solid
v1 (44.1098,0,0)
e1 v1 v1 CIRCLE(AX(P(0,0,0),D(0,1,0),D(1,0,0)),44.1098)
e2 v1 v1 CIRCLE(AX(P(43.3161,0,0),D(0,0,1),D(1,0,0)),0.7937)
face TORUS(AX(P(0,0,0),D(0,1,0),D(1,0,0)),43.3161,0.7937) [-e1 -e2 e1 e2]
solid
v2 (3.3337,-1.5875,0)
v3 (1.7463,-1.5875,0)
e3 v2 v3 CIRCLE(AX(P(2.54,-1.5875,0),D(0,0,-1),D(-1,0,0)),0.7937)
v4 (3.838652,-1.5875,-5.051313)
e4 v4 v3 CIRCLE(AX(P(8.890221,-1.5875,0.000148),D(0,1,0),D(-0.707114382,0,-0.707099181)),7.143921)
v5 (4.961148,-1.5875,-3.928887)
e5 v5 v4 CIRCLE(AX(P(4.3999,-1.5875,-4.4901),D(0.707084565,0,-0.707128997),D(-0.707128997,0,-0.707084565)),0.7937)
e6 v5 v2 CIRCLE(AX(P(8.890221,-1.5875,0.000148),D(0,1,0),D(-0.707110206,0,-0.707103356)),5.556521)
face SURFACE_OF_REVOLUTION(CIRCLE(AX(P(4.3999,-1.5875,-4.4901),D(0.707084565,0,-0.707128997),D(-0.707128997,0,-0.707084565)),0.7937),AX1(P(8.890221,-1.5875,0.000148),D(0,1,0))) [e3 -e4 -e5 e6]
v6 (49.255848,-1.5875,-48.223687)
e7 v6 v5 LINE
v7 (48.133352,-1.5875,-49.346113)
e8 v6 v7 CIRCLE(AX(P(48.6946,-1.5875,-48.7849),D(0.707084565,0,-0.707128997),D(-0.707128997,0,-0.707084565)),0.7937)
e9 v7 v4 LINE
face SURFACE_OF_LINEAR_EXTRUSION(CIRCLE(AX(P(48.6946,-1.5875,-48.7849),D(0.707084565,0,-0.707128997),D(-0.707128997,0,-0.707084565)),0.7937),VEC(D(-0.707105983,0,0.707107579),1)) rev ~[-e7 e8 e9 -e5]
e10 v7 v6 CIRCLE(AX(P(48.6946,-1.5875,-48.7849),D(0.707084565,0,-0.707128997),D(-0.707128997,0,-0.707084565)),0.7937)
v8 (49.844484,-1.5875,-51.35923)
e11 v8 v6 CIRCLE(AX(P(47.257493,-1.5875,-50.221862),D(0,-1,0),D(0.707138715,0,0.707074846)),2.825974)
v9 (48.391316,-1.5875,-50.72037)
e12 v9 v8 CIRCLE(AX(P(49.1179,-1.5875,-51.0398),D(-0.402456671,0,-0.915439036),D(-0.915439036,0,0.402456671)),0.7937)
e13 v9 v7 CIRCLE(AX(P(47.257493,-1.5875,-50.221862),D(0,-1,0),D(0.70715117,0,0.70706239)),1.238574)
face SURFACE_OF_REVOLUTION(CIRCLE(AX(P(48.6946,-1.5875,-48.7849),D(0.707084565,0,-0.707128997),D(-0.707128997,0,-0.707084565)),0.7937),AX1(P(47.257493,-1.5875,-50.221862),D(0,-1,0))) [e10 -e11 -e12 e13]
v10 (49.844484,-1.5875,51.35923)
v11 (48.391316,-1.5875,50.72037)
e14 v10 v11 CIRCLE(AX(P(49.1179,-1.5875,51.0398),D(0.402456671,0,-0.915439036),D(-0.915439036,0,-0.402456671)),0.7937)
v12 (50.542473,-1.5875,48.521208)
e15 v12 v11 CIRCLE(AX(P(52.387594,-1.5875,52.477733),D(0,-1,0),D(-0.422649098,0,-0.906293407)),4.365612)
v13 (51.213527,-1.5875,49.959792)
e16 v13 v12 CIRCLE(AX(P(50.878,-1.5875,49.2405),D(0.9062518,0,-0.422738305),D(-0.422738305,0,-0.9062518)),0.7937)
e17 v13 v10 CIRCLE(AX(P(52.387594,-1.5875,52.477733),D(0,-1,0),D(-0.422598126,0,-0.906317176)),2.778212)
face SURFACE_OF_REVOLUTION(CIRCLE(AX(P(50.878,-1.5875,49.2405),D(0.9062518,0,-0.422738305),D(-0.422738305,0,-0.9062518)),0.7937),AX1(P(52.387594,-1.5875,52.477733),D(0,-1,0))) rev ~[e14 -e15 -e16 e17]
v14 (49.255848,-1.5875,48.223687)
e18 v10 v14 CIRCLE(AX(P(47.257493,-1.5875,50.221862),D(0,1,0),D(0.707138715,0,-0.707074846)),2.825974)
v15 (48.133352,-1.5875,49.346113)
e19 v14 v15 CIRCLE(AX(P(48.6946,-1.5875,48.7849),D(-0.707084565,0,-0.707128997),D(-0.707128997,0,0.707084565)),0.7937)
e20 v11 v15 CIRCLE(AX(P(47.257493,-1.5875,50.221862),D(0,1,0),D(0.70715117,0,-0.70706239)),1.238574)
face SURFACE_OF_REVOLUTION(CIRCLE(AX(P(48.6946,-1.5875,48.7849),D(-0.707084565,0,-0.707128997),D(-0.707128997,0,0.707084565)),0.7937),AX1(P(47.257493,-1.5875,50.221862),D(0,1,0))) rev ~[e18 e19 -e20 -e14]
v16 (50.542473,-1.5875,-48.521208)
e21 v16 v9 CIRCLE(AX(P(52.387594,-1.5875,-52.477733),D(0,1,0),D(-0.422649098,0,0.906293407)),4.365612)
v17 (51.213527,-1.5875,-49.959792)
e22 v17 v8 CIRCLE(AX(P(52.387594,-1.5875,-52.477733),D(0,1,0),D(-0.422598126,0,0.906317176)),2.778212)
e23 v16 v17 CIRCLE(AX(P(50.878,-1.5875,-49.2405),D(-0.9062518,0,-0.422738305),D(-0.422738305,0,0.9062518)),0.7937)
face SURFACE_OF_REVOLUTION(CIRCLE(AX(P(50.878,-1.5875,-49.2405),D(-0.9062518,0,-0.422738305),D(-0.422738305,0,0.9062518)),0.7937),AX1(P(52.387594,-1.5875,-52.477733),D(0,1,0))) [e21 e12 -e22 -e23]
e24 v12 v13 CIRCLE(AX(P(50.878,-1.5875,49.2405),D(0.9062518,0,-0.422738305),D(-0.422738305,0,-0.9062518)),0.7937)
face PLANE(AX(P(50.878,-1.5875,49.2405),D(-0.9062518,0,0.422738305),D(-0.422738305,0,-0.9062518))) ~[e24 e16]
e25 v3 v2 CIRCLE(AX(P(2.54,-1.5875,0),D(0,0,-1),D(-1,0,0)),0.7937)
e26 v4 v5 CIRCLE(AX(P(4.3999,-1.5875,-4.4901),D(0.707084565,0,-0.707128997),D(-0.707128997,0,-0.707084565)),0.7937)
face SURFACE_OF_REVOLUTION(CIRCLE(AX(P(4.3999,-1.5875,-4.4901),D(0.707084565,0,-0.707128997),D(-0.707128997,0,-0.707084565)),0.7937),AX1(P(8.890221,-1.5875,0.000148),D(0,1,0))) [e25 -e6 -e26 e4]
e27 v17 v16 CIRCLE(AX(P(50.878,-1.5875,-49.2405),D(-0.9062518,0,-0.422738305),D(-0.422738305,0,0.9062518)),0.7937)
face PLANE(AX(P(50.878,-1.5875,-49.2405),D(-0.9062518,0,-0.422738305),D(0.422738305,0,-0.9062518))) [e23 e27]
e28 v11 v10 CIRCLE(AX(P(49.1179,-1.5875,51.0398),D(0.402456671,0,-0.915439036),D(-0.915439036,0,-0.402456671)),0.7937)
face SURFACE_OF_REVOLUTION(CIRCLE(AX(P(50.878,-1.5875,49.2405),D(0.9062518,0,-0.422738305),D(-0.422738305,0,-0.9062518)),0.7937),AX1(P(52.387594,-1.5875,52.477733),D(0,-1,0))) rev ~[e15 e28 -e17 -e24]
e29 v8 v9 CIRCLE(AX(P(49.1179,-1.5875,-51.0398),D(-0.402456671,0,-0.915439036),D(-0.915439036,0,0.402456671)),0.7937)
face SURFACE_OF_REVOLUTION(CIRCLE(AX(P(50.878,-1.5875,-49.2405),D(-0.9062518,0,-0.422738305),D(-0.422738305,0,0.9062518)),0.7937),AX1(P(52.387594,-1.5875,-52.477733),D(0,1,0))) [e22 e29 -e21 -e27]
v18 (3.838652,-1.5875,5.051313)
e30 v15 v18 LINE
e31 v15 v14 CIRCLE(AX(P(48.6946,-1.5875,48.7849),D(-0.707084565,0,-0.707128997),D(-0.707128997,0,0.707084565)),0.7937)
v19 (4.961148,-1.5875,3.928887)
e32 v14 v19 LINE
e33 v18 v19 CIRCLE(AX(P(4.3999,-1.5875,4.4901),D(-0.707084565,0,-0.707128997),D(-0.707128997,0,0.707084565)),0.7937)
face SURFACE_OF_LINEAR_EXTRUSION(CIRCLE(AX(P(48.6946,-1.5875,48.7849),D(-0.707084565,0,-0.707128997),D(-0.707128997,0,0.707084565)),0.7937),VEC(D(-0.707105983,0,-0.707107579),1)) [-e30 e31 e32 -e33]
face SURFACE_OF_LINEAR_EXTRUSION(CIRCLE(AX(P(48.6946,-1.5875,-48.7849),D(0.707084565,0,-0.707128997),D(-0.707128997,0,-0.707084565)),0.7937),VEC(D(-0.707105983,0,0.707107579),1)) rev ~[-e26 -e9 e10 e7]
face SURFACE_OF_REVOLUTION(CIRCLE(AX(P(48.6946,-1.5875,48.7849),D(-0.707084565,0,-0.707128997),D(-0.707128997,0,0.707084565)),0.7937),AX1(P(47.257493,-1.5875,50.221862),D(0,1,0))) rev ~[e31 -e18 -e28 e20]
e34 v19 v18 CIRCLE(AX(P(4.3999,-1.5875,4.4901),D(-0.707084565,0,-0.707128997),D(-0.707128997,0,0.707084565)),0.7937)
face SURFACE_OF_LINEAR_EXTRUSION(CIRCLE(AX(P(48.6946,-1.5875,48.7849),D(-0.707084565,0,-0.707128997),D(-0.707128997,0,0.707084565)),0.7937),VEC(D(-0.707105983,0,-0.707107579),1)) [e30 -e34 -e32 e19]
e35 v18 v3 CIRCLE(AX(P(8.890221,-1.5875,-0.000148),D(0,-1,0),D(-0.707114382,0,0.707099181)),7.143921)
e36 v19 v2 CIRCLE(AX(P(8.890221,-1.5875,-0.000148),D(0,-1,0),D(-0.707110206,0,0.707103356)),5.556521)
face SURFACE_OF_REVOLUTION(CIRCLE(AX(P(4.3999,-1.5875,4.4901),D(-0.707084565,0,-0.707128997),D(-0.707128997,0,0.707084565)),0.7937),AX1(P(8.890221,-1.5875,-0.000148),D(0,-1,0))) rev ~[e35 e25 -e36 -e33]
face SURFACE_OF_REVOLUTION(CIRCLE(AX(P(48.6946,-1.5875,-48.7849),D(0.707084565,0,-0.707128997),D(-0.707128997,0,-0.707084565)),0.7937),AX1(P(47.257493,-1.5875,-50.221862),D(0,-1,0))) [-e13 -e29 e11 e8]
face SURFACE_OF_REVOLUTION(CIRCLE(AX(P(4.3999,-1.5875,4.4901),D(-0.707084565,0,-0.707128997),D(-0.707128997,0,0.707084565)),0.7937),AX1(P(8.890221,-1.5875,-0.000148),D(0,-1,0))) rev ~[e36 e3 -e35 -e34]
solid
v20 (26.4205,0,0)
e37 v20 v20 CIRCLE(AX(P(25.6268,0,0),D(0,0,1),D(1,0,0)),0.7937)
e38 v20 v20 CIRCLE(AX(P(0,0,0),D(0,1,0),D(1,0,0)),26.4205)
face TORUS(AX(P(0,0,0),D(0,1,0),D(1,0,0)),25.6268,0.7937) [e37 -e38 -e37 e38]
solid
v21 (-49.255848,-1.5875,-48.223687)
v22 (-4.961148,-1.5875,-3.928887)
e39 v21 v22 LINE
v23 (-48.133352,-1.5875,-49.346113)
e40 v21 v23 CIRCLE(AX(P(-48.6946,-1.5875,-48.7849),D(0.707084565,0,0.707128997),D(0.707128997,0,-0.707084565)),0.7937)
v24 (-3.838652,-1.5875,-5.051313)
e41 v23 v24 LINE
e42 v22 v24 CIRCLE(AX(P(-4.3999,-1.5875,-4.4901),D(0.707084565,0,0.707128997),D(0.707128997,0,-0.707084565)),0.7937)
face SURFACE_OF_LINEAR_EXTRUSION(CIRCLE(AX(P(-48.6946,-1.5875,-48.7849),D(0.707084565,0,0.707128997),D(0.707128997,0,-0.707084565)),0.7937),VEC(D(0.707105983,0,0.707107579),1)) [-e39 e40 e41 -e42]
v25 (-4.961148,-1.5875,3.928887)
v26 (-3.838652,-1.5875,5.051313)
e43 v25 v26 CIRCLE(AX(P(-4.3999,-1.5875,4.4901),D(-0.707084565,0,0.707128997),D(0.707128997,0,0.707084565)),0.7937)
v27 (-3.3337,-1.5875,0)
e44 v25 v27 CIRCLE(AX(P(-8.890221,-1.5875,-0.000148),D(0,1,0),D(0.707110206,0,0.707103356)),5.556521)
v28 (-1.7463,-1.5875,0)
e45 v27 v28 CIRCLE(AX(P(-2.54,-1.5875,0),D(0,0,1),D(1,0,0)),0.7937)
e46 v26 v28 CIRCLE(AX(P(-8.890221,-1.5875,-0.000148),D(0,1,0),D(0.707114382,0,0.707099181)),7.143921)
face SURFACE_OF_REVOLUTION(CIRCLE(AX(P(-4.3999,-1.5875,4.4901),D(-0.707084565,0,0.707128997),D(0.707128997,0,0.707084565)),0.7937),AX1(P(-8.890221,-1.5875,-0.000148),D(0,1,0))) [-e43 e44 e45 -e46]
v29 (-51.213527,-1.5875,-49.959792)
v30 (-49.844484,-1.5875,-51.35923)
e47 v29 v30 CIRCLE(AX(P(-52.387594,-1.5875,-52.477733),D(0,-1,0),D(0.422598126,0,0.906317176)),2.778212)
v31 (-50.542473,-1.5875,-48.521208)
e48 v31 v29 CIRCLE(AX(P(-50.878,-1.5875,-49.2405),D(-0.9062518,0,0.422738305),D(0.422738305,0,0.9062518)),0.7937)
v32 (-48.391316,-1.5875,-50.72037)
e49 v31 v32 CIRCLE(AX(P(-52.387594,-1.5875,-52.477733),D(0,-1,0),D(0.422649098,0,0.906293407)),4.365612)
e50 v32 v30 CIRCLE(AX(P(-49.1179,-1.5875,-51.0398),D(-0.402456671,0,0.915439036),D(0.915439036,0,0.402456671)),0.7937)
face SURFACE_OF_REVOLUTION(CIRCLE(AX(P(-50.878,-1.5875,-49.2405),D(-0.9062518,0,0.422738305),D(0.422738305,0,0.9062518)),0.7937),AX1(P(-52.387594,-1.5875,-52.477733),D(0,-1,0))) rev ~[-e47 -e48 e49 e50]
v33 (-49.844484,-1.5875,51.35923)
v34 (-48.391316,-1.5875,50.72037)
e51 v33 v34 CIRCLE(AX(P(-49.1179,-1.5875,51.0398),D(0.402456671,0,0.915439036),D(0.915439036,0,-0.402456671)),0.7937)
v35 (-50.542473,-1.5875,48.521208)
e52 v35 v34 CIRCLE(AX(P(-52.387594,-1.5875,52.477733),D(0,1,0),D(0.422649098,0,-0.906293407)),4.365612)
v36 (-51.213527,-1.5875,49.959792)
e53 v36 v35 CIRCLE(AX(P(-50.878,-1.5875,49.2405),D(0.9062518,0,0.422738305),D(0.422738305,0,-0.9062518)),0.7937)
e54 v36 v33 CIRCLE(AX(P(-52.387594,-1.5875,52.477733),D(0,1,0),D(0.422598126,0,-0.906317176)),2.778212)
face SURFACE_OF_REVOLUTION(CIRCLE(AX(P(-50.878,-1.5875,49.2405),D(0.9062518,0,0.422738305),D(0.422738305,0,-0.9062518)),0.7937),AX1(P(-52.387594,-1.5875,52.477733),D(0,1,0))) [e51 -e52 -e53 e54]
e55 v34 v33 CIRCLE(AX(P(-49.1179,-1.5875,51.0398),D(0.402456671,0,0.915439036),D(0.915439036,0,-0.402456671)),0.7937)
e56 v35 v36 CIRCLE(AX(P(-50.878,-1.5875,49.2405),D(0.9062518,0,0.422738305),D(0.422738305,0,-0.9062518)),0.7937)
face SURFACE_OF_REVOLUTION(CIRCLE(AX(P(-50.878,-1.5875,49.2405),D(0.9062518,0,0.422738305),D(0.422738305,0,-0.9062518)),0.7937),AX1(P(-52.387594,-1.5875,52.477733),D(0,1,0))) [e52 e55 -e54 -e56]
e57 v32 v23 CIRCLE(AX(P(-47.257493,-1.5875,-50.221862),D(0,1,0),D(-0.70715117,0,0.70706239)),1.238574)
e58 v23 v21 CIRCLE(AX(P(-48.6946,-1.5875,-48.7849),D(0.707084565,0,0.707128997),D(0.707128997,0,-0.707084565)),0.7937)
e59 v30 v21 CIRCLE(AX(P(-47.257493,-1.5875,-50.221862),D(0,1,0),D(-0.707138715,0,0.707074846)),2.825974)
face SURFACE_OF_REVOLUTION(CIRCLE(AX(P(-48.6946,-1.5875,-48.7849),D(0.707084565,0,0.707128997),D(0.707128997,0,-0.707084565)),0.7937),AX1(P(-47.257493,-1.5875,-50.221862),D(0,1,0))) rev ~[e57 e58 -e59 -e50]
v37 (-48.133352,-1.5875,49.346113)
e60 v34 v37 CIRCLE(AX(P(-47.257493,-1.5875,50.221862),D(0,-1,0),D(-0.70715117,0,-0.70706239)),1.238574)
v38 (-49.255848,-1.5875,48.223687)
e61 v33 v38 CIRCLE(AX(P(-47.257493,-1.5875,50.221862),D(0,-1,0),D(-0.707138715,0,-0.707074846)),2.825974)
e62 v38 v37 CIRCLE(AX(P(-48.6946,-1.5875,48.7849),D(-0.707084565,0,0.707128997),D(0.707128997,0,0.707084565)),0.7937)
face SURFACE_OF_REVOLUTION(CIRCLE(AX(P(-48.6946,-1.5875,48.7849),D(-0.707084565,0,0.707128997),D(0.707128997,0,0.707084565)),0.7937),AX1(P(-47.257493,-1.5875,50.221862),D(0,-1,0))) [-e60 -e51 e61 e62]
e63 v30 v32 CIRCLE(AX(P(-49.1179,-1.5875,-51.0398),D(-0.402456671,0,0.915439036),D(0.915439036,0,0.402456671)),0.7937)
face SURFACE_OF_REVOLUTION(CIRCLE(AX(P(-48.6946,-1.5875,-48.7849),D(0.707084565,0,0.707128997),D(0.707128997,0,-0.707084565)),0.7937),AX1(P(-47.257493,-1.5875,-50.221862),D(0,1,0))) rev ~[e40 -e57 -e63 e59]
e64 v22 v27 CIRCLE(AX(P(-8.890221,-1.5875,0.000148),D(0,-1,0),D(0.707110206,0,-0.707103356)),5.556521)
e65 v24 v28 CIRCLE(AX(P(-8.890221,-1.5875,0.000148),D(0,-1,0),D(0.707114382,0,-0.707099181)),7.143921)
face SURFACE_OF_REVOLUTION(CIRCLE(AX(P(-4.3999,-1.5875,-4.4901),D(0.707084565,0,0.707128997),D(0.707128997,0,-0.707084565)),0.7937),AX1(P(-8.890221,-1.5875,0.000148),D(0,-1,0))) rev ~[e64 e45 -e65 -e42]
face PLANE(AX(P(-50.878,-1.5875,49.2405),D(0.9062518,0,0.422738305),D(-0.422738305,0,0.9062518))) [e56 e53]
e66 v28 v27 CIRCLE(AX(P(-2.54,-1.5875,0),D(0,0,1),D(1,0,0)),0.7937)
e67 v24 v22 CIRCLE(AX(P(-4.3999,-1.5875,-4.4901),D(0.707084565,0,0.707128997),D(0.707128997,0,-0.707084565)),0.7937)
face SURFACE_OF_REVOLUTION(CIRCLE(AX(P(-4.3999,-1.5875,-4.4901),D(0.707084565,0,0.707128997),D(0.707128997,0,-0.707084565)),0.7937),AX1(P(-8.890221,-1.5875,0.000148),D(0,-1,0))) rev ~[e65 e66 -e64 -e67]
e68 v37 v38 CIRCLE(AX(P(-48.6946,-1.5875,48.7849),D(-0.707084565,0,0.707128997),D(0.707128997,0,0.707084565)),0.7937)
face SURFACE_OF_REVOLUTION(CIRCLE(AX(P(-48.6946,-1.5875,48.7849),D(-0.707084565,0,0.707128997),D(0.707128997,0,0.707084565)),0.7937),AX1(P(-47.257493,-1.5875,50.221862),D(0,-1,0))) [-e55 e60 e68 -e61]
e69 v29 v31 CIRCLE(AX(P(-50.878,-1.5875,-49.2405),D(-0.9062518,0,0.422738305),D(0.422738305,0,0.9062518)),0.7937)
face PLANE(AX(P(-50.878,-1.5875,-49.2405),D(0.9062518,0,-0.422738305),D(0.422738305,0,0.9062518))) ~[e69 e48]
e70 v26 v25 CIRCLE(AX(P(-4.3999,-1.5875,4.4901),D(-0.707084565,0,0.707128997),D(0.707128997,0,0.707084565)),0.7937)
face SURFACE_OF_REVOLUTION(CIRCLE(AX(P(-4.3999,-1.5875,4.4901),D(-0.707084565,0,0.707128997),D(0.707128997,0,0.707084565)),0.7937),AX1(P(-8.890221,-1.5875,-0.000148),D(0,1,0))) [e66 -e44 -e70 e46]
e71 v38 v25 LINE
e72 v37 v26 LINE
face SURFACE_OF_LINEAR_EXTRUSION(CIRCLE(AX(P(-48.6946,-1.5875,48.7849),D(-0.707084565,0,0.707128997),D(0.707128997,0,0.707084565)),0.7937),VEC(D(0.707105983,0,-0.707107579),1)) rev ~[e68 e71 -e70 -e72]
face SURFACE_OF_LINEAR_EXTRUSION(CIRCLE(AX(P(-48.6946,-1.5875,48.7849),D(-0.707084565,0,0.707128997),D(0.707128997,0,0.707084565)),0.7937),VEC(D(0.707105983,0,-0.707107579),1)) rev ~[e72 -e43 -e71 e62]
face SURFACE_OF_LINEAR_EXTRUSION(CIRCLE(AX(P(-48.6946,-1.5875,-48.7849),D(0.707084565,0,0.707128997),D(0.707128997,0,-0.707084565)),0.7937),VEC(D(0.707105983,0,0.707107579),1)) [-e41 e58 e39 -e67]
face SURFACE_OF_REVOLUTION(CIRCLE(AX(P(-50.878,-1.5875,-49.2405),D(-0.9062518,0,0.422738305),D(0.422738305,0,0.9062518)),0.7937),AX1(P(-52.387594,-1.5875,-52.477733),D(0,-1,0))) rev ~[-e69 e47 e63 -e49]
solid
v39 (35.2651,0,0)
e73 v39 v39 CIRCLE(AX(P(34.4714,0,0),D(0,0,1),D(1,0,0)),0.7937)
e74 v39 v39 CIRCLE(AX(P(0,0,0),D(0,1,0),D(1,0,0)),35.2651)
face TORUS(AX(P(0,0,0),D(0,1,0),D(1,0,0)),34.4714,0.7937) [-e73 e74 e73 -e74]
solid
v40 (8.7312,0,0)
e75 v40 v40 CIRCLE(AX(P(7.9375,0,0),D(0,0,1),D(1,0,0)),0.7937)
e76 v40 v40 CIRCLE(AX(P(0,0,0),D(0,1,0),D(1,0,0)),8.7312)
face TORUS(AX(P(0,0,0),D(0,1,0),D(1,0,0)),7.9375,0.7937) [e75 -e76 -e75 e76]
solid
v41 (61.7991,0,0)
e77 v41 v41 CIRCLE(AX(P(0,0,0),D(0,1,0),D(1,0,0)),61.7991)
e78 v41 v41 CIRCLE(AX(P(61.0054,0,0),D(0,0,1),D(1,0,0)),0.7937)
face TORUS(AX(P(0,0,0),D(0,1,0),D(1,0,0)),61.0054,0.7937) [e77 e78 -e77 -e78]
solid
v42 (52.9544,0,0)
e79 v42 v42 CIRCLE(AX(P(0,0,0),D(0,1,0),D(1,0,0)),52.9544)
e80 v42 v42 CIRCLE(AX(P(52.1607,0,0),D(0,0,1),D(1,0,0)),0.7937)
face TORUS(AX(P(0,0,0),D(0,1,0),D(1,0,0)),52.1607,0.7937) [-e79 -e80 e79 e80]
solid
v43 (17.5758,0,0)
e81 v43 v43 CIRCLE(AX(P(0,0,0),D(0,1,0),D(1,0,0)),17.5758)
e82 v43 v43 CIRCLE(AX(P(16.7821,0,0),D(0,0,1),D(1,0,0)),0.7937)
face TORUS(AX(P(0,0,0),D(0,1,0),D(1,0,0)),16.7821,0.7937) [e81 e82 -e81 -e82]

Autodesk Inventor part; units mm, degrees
sketch "Sketch1" plane through (0, 0, 0) normal (0, 0, 1) x (1, 0, 0)
  circle A0 centre (7.9375, 0) radius 0.7937
  circle A1 centre (16.7821, 0) radius 0.7937
  circle A2 centre (25.6268, 0) radius 0.7937
  circle A3 centre (34.4714, 0) radius 0.7937
  circle A4 centre (43.3161, 0) radius 0.7937
  circle A5 centre (52.1607, 0) radius 0.7937
  circle A6 centre (61.0054, 0) radius 0.7937
  circle A7 centre (69.85, 0) radius 0.7937
  line L0 (7.9375, 0) -> (16.7821, 0) construction
  line L1 (16.7821, 0) -> (25.6268, 0) construction
  line L2 (25.6268, 0) -> (34.4714, 0) construction
  line L3 (34.4714, 0) -> (43.3161, 0) construction
  line L4 (43.3161, 0) -> (52.1607, 0) construction
  line L5 (52.1607, 0) -> (61.0054, 0) construction
  line L6 (61.0054, 0) -> (69.85, 0) construction
  line L7 (0, -1.1113) -> (0, 1.1113) projected
  point P0 (0, 0)
  dimension "d0" = 1.5875
  dimension "d1" = 139.7
  dimension "d2" = 15.875
revolve "Revolution1" add sketch "Sketch1" angle 360 about axis through (0, -10, 0) along (0, 1, 0) contours A0 | A1 | A2 | A3 | A4 | A5 | A6
ref_plane "Work Plane1" through (0, -1.5875, 0) normal (0, 1, 0) x (-1, 0, 0)
sketch "Sketch2" plane through (0, -1.5875, 0) normal (0, 1, 0) x (-1, 0, 0)
  line L0 (48.6946, 48.7849) -> (4.3999, 4.4901)
  arc A0 (4.3999, 4.4901) -> (2.54, 0) centre (8.89, 0) ccw
  arc A1 (48.6946, 48.7849) -> (49.1179, 51.0398) centre (47.2578, 50.2217) ccw
  arc A2 (50.878, 49.2405) -> (49.1179, 51.0398) centre (52.3875, 52.4778) ccw
  line L1 (0, -11.5058) -> (0, 69.0346) projected
  line L2 (52.3875, 52.4778) -> (50.878, 49.2405) construction
  point P0 (0, 0)
  dimension "d6" = 7.1437
  dimension "d7" = 2.032
  dimension "d8" = 45
  dimension "d9" = 6.35
  dimension "d10" = 2.54
  dimension "d11" = 20
  dimension "d14" = 52.3875
ref_plane "Work Plane2" through (-2.54, -1.5875, 0) normal (0, 0, 1) x (1, 0, 0)
sketch "Sketch3" plane through (-2.54, -1.5875, 0) normal (0, 0, 1) x (1, 0, 0)
  line L0 (0, 0) -> (-1.8599, 0) projected
  circle A0 centre (0, 0) radius 0.7937
  point P0 (2.54, 1.5875)
  dimension "d12" = 1.5875
sweep "Sweep1" add profiles "Sketch3" path "Sketch2" path curves A0 L0 A1 A2
mirror "Mirror1" about plane through (0, 0, 0) normal (0, 0, 1) of "Sweep1"
mirror "Mirror2" about plane through (0, 0, 0) normal (1, 0, 0) of "Sweep1", "Mirror1"
ref_plane "Work Plane4" through (-4.3999, -2.3812, 4.4901) normal (0, 1, 0) x (-1, 0, 0)
properties part number "Fan Guard"
